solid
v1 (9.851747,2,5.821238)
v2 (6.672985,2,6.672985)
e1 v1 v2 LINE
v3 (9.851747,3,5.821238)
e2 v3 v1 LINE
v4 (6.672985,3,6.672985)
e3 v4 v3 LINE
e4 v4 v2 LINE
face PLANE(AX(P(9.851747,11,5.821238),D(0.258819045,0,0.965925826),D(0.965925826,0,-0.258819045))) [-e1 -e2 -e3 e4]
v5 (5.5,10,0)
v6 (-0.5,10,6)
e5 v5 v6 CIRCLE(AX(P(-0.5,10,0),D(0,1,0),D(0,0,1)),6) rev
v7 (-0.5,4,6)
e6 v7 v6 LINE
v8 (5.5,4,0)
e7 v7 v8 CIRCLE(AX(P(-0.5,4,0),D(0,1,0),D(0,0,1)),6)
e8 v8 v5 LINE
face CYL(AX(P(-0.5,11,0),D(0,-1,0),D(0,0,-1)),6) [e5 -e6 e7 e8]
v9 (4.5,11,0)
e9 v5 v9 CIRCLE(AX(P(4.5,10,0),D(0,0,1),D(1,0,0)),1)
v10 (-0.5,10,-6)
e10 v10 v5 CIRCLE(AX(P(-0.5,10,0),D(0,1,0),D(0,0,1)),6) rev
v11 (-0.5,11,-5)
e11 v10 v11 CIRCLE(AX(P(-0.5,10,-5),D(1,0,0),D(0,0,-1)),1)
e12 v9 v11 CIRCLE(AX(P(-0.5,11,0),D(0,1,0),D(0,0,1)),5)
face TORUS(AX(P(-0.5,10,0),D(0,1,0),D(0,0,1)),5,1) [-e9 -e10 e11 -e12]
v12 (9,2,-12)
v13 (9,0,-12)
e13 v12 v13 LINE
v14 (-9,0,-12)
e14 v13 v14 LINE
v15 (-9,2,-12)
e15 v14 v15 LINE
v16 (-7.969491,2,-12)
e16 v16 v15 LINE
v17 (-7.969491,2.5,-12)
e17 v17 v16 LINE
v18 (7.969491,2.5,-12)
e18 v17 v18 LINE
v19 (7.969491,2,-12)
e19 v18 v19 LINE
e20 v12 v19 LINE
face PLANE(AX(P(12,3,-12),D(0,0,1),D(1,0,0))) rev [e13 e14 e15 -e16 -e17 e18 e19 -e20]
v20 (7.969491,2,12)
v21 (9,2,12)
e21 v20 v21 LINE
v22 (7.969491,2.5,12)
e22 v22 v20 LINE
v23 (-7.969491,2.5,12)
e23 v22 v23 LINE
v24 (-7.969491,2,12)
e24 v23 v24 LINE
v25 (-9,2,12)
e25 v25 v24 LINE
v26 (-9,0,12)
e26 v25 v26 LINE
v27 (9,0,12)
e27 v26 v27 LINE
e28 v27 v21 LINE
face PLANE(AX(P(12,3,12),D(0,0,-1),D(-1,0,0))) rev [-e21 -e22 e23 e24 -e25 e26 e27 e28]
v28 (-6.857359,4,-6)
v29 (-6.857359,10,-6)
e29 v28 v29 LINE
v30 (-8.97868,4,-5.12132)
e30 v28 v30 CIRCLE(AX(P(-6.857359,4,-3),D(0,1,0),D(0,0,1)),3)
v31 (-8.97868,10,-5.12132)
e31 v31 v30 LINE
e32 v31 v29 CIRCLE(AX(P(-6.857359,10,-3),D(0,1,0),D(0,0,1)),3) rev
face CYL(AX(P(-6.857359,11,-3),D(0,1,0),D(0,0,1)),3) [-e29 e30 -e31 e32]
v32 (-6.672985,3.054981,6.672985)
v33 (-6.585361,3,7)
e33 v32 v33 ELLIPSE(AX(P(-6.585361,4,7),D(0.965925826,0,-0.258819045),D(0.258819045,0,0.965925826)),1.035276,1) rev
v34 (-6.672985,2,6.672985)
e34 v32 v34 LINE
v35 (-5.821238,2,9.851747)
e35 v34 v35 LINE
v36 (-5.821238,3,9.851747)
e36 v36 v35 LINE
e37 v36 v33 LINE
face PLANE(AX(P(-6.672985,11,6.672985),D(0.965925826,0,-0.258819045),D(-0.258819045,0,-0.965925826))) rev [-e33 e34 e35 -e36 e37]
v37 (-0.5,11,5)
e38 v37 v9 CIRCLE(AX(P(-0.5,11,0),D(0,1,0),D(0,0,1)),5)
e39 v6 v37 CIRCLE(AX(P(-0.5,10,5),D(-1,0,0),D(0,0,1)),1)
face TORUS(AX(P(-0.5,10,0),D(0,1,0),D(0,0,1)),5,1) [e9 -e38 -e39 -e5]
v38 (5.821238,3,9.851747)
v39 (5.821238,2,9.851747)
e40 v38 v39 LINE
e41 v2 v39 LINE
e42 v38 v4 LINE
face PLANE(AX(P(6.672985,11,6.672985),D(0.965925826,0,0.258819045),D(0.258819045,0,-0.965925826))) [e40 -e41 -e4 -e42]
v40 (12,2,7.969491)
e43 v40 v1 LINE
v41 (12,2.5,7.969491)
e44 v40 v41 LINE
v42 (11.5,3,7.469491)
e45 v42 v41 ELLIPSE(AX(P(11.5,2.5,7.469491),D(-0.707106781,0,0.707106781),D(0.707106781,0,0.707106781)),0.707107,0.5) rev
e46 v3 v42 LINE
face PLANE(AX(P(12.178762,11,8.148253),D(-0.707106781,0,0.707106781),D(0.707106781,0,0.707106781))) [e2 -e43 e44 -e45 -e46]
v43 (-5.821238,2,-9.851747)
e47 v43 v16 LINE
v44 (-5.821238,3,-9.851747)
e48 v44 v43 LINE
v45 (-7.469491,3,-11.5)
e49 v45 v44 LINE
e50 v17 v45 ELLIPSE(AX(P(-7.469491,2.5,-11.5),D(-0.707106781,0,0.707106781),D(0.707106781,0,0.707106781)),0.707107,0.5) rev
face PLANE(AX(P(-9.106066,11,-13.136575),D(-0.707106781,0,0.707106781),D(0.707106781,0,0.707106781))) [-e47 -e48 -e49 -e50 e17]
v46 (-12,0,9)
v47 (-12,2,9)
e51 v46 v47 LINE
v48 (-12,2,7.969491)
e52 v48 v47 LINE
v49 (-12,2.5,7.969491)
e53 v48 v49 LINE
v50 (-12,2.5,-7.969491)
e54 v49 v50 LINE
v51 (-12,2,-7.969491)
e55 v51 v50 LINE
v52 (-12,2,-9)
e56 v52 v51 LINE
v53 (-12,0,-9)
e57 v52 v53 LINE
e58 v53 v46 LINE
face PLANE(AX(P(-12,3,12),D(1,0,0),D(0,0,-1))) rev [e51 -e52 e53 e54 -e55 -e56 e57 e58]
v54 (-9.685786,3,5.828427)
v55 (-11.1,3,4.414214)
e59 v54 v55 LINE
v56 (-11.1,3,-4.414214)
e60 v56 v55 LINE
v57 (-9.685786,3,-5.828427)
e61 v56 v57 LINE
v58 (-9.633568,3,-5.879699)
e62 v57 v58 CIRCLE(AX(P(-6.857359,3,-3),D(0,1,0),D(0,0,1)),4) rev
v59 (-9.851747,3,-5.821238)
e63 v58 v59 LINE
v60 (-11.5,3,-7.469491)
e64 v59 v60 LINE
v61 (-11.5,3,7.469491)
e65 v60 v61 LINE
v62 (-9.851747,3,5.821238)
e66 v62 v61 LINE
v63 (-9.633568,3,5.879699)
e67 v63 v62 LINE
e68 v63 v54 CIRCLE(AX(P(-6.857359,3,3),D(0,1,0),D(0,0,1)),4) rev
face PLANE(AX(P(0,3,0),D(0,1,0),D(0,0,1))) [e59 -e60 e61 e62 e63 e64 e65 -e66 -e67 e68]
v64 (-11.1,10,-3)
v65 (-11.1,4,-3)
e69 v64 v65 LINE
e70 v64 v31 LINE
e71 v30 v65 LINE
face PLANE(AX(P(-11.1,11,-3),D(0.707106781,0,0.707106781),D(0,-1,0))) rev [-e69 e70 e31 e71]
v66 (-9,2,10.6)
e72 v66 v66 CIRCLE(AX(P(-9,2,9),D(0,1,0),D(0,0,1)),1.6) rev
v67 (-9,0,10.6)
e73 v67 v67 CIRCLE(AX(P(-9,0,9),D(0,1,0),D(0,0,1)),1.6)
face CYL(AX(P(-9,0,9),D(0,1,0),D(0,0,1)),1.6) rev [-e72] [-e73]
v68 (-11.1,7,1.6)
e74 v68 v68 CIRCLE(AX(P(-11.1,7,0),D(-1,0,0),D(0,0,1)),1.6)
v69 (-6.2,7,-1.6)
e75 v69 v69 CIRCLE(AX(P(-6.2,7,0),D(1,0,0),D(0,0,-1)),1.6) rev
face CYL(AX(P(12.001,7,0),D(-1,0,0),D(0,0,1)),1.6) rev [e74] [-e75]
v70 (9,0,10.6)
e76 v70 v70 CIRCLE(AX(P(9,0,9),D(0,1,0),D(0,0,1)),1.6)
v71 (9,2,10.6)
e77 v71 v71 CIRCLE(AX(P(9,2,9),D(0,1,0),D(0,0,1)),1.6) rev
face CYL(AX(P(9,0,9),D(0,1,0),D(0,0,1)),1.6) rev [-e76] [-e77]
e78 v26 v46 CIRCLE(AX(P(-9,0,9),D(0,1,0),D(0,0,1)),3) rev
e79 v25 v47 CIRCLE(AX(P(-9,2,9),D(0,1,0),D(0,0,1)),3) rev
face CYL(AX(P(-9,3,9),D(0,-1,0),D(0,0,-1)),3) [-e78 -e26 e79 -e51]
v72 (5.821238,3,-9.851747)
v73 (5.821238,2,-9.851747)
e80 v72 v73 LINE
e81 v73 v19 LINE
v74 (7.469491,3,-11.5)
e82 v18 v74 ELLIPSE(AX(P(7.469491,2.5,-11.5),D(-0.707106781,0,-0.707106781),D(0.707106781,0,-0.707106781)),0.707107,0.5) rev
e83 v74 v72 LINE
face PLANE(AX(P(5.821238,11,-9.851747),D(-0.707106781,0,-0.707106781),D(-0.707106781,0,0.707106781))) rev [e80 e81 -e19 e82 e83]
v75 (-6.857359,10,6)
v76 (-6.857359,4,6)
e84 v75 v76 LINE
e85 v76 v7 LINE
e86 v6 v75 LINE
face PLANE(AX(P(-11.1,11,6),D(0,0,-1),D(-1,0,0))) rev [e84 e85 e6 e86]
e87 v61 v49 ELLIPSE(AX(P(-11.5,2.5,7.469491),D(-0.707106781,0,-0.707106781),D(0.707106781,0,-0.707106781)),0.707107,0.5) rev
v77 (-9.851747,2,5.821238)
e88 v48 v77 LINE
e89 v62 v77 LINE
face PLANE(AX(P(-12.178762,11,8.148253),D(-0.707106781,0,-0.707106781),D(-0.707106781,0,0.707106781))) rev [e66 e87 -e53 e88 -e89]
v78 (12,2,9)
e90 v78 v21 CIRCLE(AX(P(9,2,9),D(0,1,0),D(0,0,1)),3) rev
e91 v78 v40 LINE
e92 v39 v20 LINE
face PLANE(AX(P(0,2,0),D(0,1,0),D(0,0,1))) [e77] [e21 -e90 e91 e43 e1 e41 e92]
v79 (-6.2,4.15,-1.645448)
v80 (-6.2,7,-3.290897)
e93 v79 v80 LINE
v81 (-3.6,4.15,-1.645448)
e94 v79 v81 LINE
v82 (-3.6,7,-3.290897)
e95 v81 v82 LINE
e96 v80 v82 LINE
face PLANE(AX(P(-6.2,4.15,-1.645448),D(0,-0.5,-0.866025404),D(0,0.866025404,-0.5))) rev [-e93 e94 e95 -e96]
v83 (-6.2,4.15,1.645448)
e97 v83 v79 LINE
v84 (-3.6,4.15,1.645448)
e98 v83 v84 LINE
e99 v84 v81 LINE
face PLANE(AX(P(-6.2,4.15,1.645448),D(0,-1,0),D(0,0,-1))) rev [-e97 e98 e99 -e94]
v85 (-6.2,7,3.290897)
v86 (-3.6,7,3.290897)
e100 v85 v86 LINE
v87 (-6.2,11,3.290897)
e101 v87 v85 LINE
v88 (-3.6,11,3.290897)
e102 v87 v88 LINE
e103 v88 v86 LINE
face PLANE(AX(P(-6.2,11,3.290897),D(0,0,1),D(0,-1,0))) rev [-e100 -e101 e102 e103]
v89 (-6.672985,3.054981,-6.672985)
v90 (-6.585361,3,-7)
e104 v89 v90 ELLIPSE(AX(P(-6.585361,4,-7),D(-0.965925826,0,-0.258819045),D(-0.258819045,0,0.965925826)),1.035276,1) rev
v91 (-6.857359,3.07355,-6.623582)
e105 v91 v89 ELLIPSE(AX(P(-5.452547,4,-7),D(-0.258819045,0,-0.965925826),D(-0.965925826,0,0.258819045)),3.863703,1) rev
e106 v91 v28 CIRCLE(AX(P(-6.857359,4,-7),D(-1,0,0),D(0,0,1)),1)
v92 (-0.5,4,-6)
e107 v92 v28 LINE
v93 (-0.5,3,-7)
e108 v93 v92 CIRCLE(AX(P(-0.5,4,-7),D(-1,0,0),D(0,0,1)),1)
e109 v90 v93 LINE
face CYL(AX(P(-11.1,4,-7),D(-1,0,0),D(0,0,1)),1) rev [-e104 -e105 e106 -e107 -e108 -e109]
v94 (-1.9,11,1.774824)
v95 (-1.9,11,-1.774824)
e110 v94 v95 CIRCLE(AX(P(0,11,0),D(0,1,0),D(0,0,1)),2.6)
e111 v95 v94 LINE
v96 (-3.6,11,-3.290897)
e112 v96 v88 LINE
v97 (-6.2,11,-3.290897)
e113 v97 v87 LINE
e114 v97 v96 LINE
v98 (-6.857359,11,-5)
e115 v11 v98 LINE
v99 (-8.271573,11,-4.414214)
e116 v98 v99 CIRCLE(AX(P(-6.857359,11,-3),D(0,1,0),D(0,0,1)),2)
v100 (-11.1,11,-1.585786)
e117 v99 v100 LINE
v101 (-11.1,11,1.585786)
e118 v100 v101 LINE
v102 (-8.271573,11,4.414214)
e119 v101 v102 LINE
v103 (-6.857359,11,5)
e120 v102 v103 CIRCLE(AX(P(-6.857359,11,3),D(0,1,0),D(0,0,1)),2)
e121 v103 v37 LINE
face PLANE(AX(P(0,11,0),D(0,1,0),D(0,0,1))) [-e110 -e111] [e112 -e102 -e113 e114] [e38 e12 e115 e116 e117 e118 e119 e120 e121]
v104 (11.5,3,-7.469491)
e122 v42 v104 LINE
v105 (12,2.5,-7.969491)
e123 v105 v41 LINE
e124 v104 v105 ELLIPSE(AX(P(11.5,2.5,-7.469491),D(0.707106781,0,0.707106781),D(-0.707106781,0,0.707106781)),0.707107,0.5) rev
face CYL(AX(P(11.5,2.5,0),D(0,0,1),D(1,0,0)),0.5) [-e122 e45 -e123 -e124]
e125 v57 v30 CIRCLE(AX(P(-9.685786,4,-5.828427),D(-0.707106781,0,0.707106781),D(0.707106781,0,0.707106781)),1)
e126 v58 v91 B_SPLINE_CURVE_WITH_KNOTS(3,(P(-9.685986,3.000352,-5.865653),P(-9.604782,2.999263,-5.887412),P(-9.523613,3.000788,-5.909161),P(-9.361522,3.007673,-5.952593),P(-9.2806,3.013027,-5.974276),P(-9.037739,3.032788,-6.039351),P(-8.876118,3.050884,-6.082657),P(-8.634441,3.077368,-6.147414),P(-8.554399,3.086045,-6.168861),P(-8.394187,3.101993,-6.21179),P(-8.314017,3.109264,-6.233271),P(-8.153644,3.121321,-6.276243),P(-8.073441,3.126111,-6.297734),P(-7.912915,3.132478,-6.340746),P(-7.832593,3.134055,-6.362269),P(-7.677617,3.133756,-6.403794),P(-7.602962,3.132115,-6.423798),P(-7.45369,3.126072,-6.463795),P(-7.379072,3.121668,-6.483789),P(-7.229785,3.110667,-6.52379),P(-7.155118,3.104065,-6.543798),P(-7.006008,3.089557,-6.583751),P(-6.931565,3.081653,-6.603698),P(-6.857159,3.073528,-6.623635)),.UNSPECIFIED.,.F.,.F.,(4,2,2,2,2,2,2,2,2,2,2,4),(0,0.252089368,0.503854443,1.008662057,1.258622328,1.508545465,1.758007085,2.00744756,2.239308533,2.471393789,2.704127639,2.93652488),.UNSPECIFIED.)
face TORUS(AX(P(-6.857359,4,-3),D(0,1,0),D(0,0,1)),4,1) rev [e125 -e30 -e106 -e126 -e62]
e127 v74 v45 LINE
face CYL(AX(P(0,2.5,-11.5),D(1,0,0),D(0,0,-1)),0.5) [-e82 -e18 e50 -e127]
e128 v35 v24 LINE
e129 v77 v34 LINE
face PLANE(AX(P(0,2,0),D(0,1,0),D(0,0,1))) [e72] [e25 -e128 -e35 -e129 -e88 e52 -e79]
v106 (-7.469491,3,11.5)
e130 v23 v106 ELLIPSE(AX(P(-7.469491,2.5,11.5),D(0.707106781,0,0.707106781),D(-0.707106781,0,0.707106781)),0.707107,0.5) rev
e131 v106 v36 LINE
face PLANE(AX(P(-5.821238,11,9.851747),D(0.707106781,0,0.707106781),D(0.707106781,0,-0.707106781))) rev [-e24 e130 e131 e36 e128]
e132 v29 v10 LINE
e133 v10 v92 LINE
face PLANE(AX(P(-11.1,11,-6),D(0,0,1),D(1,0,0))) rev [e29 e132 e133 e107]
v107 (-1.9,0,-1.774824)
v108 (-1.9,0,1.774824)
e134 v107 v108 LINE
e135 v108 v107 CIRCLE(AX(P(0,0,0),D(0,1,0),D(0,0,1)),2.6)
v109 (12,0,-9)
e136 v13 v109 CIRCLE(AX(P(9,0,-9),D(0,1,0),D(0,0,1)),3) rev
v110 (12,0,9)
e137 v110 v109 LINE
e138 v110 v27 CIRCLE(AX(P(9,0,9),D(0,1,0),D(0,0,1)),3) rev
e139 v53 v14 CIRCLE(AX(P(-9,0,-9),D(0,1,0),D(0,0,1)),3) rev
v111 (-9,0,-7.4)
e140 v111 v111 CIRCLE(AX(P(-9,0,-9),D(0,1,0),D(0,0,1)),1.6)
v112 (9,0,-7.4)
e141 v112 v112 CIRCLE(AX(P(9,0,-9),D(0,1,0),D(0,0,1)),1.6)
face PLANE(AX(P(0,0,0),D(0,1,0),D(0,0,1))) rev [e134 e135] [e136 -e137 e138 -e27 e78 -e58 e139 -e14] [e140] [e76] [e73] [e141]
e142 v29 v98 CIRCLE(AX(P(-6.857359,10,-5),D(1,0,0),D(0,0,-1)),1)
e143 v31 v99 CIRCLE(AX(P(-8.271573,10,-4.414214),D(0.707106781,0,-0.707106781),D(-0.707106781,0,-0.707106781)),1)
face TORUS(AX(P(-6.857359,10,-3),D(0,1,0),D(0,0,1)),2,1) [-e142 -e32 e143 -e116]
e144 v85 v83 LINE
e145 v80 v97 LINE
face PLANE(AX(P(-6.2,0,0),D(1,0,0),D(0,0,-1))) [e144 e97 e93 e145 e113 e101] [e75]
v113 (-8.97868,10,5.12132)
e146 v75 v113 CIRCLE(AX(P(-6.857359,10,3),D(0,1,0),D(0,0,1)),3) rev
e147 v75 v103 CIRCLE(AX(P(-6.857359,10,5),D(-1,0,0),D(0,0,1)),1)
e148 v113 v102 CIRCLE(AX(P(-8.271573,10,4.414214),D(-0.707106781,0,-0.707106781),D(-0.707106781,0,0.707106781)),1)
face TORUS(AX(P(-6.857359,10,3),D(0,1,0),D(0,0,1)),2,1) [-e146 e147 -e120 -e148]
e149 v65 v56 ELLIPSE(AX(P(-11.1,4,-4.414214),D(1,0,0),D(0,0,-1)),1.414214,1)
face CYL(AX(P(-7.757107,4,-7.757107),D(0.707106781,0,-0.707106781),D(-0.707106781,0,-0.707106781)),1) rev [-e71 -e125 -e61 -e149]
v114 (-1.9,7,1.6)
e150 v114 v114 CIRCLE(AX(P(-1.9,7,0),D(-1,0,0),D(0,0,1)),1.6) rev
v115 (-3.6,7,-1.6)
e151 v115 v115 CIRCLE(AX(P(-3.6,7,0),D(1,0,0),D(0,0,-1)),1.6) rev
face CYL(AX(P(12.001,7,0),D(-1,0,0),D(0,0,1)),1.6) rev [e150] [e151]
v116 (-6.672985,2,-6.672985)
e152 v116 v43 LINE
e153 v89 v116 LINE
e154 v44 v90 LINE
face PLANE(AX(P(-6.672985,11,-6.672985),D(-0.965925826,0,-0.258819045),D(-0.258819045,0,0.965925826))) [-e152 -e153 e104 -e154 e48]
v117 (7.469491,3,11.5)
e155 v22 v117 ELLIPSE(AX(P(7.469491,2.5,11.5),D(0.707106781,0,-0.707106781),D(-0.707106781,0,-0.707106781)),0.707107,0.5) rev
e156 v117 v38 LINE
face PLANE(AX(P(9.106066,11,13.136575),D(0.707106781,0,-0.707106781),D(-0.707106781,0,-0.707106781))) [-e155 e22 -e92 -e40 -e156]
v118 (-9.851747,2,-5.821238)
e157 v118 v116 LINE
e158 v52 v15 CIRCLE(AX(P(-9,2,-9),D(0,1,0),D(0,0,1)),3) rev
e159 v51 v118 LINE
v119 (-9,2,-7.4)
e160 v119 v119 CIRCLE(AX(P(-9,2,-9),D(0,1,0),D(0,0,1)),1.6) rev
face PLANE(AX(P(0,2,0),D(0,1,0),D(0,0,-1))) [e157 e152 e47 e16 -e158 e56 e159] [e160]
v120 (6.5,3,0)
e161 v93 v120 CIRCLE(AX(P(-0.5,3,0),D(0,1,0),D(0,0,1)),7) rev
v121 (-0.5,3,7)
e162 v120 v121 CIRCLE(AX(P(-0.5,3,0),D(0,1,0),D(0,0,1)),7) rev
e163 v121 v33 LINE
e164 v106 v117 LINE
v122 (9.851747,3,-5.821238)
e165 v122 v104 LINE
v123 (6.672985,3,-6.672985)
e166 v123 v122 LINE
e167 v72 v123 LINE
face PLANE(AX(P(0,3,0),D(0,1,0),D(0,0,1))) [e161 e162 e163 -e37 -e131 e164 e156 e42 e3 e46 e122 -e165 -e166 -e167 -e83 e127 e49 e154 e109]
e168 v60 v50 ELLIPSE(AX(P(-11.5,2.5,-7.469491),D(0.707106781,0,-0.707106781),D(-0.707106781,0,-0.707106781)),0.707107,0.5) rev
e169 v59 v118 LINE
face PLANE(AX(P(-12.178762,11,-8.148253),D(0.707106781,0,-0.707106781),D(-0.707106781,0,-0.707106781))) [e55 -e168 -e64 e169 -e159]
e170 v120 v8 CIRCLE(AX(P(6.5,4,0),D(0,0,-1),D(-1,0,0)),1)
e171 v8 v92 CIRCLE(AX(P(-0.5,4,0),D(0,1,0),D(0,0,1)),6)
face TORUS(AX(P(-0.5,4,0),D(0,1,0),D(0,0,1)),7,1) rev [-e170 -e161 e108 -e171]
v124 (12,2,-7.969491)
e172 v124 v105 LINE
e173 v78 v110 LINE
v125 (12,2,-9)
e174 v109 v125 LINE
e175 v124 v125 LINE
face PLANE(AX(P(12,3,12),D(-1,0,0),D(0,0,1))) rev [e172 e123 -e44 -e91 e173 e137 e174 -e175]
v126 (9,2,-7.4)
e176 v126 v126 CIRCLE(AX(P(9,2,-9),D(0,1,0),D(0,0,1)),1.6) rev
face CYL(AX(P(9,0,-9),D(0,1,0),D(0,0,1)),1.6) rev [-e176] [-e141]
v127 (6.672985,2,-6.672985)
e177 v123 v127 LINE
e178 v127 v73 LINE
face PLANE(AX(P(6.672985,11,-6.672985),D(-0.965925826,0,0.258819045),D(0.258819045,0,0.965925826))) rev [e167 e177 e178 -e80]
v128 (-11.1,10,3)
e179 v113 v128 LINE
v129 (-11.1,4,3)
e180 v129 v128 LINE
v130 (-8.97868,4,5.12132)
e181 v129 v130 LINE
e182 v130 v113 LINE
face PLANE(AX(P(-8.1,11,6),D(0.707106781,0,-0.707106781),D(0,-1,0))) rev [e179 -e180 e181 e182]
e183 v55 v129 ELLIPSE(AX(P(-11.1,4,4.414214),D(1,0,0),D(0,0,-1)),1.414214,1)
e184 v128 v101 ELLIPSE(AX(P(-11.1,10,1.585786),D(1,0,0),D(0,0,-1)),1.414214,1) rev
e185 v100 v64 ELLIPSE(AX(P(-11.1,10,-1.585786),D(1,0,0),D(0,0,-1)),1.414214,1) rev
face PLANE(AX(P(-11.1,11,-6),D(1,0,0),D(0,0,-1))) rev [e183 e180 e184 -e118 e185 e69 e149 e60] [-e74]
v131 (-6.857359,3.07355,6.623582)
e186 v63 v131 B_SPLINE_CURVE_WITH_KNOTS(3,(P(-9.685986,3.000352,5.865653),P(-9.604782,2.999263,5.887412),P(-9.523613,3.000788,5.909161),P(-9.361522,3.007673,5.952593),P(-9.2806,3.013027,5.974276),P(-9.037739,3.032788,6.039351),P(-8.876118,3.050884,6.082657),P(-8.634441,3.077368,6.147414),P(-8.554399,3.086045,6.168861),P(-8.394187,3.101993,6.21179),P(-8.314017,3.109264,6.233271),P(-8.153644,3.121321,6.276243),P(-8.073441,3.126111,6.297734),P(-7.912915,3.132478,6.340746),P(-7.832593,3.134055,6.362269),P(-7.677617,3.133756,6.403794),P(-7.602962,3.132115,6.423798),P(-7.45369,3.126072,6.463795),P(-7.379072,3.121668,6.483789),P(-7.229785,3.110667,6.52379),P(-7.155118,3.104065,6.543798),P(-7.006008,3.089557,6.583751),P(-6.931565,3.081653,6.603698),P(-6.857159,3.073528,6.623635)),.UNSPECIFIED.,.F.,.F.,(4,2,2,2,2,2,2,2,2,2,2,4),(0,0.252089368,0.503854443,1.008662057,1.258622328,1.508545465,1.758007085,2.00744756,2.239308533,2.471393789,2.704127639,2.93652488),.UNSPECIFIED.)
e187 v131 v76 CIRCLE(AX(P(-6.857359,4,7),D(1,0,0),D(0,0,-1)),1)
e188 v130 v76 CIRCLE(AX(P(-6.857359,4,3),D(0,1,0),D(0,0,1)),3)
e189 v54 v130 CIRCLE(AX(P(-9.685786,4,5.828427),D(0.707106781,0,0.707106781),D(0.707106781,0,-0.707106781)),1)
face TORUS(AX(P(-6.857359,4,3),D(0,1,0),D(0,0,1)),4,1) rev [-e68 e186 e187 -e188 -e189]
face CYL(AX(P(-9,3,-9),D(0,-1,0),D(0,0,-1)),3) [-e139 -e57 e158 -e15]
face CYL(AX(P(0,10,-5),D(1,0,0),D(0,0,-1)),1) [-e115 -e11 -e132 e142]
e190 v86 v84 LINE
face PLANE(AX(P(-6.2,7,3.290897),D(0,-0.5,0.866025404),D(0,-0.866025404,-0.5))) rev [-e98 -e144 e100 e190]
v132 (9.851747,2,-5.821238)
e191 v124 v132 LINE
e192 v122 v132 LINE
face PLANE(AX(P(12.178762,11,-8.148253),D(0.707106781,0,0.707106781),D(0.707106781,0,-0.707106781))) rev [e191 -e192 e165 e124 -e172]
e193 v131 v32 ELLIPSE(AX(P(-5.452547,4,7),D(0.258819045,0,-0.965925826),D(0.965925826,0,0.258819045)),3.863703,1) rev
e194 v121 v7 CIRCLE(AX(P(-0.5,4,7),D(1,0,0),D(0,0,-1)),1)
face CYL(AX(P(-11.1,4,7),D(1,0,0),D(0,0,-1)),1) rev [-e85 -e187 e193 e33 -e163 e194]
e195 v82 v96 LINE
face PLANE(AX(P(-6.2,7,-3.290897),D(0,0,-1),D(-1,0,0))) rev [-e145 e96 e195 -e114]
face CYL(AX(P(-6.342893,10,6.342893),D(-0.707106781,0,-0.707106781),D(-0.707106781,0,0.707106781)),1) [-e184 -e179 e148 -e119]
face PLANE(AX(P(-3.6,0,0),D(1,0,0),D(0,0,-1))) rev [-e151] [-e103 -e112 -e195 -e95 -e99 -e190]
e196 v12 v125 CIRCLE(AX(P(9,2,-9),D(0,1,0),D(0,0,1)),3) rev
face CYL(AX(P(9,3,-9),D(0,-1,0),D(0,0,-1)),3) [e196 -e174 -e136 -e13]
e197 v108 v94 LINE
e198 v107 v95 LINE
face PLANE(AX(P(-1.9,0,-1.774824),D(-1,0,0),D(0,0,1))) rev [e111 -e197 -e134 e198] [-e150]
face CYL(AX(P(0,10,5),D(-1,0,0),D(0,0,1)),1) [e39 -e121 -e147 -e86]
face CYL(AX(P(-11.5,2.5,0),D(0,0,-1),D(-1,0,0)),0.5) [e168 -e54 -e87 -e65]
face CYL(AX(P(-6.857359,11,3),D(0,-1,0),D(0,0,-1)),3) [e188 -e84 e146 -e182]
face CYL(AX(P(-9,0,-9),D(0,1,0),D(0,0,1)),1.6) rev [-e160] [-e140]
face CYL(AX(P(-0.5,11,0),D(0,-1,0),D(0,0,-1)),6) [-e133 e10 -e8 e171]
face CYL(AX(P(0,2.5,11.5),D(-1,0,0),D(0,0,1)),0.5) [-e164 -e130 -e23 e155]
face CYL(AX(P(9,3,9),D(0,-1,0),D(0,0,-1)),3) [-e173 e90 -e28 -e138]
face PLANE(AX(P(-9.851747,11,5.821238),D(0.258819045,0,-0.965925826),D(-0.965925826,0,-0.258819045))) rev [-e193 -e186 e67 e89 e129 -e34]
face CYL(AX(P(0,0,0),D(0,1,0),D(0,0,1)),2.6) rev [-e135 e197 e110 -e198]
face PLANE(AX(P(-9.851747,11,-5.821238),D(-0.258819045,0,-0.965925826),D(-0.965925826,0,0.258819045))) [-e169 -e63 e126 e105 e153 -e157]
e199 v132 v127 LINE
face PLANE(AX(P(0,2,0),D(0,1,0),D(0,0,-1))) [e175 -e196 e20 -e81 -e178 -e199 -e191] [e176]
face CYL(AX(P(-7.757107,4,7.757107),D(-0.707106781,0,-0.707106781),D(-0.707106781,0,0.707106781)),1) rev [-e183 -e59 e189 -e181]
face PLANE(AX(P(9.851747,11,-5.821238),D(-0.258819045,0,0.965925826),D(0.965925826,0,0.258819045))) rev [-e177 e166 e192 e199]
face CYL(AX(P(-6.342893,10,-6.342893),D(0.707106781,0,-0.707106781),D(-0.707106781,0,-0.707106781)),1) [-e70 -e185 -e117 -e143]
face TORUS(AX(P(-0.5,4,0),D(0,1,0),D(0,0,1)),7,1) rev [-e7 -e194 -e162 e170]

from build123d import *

# Parameters (mm, degrees)
SKETCH1_W            = 24
SKETCH1_H            = 24
BOSS_EXTRUDE1_DEPTH  = 3
SKETCH2_W            = 16.6
SKETCH2_H            = 12
BOSS_EXTRUDE2_DEPTH  = 8
CUT_EXTRUDE1_DEPTH   = 21.223748416
CUT_EXTRUDE2_REACH   = 30.26
SKETCH4_R            = 1.6
CUT_EXTRUDE3_DEPTH   = 1.3
FILLET3_R            = 6
CHAMFER3_SIZE        = 3
FILLET4_R            = 3
FILLET6_R            = 1
SKETCH9_R            = 1.6
CUT_EXTRUDE5_DEPTH   = 19.761663039
FILLET8_R            = 3
FILLET9_R            = 0.5
CUT_EXTRUDE6_START   = -1
CUT_EXTRUDE6_DEPTH   = 20.761663103
MIRROR2_START        = -1
MIRROR2_COPY_1_DEPTH = 20.761663103


with BuildPart() as part:
    # Sketch1 → Boss-Extrude1 (new body)
    with BuildSketch(Plane(origin=(0, 0, 0), x_dir=(1, 0, 0), z_dir=(0, 1, 0))):
        Rectangle(SKETCH1_W, SKETCH1_H)
    extrude(amount=BOSS_EXTRUDE1_DEPTH)

    # Sketch2 → Boss-Extrude2 (add)
    with BuildSketch(Plane(origin=(0, 3, 0), x_dir=(1, 0, 0), z_dir=(0, 1, 0))):
        with Locations((-2.8, 0)):
            Rectangle(SKETCH2_W, SKETCH2_H)
    extrude(amount=BOSS_EXTRUDE2_DEPTH)

    # Sketch3 → Cut-Extrude1 (cut, through all)
    with BuildSketch(Plane(origin=(0, 11, 0), x_dir=(1, 0, 0), z_dir=(0, 1, 0))):
        with BuildLine():
            Line((-1.9, 1.774823935), (-1.9, -1.774823935))
            ThreePointArc((-1.9, -1.774823935), (2.6, 0), (-1.9, 1.774823935))
        make_face()
    extrude(amount=-CUT_EXTRUDE1_DEPTH, mode=Mode.SUBTRACT)

    # Sketch4 → Cut-Extrude2 (cut, up to next)
    with BuildSketch(Plane.ZY.offset(11.1), mode=Mode.PRIVATE) as cut_extrude2_sk1:
        with Locations((0, 7)):
            Circle(SKETCH4_R)
    cut_extrude2_tool1 = extrude(cut_extrude2_sk1.sketch, amount=-CUT_EXTRUDE2_REACH, mode=Mode.PRIVATE) & part.part
    add(cut_extrude2_tool1.solids().sort_by_distance((-11.1, 7, 0))[0], mode=Mode.SUBTRACT)

    # Sketch5 → Cut-Extrude3 (cut, symmetric)
    with BuildSketch(Plane(origin=(-4.9, 0, 0), x_dir=(0, 0, -1), z_dir=(1, 0, 0))):
        Polygon((1.645448267, 4.15), (3.290896534, 7), (3.290896534, 11), (-3.290896534, 11), (-3.290896534, 7), (-1.645448267, 4.15), align=None)
    extrude(amount=CUT_EXTRUDE3_DEPTH, both=True, mode=Mode.SUBTRACT)

    # Fillet3
    fillet3_edges = [part.edges().sort_by_distance(p)[0] for p in [
        (5.5, 7, 6),
        (5.5, 7, -6),
    ]]
    fillet(fillet3_edges, radius=FILLET3_R - 0.0001)  # a hair under: the kernel refuses the full size

    # Chamfer3
    chamfer3_edges = [part.edges().sort_by_distance(p)[0] for p in [
        (-11.1, 7, -6),
        (-11.1, 7, 6),
    ]]
    chamfer(chamfer3_edges, length=CHAMFER3_SIZE)

    # Fillet4
    fillet4_edges = [part.edges().sort_by_distance(p)[0] for p in [
        (-8.1, 7, -6),
        (-8.1, 7, 6),
    ]]
    fillet(fillet4_edges, radius=FILLET4_R)

    # Fillet6
    fillet6_edges = [part.edges().sort_by_distance(p)[0] for p in [
        (-3.678629656, 11, -6),
        (3.742669976, 11, -4.242669976),
        (3.742669976, 11, 4.242669976),
        (-3.678629656, 3, -6),
        (3.742669976, 3, 4.242669976),
        (3.742669976, 3, -4.242669976),
        (-10.039339828, 11, 4.060660172),
        (-10.039339828, 3, -4.060660172),
        (-3.678629656, 11, 6),
        (-3.678629656, 3, 6),
        (-10.039339828, 3, 4.060660172),
        (-10.039339828, 11, -4.060660172),
        (-8.00540961, 11, -5.771638598),
        (-8.00540961, 11, 5.771638598),
        (-8.00540961, 3, 5.771638598),
        (-8.00540961, 3, -5.771638598),
    ]]
    fillet(fillet6_edges, radius=FILLET6_R)

    # Sketch9 → Cut-Extrude5 (cut, through all)
    with BuildSketch(Plane(origin=(0, 3, 0), x_dir=(1, 0, 0), z_dir=(0, 1, 0))):
        with Locations(Location((-9, 9, 0), (0, 0, 270))):
            Circle(SKETCH9_R)
        with Locations(Location((9, 9, 0), (0, 0, 270))):
            Circle(SKETCH9_R)
        with Locations(Location((9, -9, 0), (0, 0, 270))):
            Circle(SKETCH9_R)
        with Locations(Location((-9, -9, 0), (0, 0, 270))):
            Circle(SKETCH9_R)
    extrude(amount=-CUT_EXTRUDE5_DEPTH, mode=Mode.SUBTRACT)

    # Fillet8
    fillet8_edges = [part.edges().sort_by_distance(p)[0] for p in [
        (-12, 1.5, -12),
        (12, 1.5, -12),
        (12, 1.5, 12),
        (-12, 1.5, 12),
    ]]
    fillet(fillet8_edges, radius=FILLET8_R)

    # Fillet9
    fillet9_edges = [part.edges().sort_by_distance(p)[0] for p in [
        (12, 3, 0),
        (0, 3, 12),
        (-12, 3, 0),
        (0, 3, -12),
        (-11.121320344, 3, 11.121320344),
        (-11.121320344, 3, -11.121320344),
        (11.121320344, 3, -11.121320344),
        (11.121320344, 3, 11.121320344),
    ]]
    fillet(fillet9_edges, radius=FILLET9_R)

    # Sketch10 → Cut-Extrude6 (cut)
    with BuildSketch(Plane(origin=(0, 3, 0), x_dir=(1, 0, 0), z_dir=(0, 1, 0)).offset(CUT_EXTRUDE6_START)):
        Polygon((5.821238046, -9.851746699), (8.148253301, -12.178761954), (9.106066017, -13.13657467), (13.13657467, -9.106066017), (12.178761954, -8.148253301), (9.851746699, -5.821238046), (6.672984744, -6.672984744), align=None)
    cut_extrude6 = extrude(amount=CUT_EXTRUDE6_DEPTH, mode=Mode.SUBTRACT)

    # Mirror1: Cut-Extrude6 across plane
    add(cut_extrude6.mirror(Plane.XY), mode=Mode.SUBTRACT)

    # Mirror2: Cut-Extrude6 across plane
    add(cut_extrude6.mirror(Plane(origin=(0, 0, 0), x_dir=(0, 0, 1), z_dir=(1, 0, 0))), mode=Mode.SUBTRACT)

    # Mirror2 copy 1 sketch → Mirror2 copy 1 (cut)
    with BuildSketch(Plane(origin=(0, 3, 0), x_dir=(-1, 0, 0), z_dir=(0, 1, 0)).offset(MIRROR2_START)):
        Polygon((5.821238046, -9.851746699), (8.148253301, -12.178761954), (9.106066017, -13.13657467), (13.13657467, -9.106066017), (12.178761954, -8.148253301), (9.851746699, -5.821238046), (6.672984744, -6.672984744), align=None)
    extrude(amount=MIRROR2_COPY_1_DEPTH, mode=Mode.SUBTRACT)


solid = part.part
